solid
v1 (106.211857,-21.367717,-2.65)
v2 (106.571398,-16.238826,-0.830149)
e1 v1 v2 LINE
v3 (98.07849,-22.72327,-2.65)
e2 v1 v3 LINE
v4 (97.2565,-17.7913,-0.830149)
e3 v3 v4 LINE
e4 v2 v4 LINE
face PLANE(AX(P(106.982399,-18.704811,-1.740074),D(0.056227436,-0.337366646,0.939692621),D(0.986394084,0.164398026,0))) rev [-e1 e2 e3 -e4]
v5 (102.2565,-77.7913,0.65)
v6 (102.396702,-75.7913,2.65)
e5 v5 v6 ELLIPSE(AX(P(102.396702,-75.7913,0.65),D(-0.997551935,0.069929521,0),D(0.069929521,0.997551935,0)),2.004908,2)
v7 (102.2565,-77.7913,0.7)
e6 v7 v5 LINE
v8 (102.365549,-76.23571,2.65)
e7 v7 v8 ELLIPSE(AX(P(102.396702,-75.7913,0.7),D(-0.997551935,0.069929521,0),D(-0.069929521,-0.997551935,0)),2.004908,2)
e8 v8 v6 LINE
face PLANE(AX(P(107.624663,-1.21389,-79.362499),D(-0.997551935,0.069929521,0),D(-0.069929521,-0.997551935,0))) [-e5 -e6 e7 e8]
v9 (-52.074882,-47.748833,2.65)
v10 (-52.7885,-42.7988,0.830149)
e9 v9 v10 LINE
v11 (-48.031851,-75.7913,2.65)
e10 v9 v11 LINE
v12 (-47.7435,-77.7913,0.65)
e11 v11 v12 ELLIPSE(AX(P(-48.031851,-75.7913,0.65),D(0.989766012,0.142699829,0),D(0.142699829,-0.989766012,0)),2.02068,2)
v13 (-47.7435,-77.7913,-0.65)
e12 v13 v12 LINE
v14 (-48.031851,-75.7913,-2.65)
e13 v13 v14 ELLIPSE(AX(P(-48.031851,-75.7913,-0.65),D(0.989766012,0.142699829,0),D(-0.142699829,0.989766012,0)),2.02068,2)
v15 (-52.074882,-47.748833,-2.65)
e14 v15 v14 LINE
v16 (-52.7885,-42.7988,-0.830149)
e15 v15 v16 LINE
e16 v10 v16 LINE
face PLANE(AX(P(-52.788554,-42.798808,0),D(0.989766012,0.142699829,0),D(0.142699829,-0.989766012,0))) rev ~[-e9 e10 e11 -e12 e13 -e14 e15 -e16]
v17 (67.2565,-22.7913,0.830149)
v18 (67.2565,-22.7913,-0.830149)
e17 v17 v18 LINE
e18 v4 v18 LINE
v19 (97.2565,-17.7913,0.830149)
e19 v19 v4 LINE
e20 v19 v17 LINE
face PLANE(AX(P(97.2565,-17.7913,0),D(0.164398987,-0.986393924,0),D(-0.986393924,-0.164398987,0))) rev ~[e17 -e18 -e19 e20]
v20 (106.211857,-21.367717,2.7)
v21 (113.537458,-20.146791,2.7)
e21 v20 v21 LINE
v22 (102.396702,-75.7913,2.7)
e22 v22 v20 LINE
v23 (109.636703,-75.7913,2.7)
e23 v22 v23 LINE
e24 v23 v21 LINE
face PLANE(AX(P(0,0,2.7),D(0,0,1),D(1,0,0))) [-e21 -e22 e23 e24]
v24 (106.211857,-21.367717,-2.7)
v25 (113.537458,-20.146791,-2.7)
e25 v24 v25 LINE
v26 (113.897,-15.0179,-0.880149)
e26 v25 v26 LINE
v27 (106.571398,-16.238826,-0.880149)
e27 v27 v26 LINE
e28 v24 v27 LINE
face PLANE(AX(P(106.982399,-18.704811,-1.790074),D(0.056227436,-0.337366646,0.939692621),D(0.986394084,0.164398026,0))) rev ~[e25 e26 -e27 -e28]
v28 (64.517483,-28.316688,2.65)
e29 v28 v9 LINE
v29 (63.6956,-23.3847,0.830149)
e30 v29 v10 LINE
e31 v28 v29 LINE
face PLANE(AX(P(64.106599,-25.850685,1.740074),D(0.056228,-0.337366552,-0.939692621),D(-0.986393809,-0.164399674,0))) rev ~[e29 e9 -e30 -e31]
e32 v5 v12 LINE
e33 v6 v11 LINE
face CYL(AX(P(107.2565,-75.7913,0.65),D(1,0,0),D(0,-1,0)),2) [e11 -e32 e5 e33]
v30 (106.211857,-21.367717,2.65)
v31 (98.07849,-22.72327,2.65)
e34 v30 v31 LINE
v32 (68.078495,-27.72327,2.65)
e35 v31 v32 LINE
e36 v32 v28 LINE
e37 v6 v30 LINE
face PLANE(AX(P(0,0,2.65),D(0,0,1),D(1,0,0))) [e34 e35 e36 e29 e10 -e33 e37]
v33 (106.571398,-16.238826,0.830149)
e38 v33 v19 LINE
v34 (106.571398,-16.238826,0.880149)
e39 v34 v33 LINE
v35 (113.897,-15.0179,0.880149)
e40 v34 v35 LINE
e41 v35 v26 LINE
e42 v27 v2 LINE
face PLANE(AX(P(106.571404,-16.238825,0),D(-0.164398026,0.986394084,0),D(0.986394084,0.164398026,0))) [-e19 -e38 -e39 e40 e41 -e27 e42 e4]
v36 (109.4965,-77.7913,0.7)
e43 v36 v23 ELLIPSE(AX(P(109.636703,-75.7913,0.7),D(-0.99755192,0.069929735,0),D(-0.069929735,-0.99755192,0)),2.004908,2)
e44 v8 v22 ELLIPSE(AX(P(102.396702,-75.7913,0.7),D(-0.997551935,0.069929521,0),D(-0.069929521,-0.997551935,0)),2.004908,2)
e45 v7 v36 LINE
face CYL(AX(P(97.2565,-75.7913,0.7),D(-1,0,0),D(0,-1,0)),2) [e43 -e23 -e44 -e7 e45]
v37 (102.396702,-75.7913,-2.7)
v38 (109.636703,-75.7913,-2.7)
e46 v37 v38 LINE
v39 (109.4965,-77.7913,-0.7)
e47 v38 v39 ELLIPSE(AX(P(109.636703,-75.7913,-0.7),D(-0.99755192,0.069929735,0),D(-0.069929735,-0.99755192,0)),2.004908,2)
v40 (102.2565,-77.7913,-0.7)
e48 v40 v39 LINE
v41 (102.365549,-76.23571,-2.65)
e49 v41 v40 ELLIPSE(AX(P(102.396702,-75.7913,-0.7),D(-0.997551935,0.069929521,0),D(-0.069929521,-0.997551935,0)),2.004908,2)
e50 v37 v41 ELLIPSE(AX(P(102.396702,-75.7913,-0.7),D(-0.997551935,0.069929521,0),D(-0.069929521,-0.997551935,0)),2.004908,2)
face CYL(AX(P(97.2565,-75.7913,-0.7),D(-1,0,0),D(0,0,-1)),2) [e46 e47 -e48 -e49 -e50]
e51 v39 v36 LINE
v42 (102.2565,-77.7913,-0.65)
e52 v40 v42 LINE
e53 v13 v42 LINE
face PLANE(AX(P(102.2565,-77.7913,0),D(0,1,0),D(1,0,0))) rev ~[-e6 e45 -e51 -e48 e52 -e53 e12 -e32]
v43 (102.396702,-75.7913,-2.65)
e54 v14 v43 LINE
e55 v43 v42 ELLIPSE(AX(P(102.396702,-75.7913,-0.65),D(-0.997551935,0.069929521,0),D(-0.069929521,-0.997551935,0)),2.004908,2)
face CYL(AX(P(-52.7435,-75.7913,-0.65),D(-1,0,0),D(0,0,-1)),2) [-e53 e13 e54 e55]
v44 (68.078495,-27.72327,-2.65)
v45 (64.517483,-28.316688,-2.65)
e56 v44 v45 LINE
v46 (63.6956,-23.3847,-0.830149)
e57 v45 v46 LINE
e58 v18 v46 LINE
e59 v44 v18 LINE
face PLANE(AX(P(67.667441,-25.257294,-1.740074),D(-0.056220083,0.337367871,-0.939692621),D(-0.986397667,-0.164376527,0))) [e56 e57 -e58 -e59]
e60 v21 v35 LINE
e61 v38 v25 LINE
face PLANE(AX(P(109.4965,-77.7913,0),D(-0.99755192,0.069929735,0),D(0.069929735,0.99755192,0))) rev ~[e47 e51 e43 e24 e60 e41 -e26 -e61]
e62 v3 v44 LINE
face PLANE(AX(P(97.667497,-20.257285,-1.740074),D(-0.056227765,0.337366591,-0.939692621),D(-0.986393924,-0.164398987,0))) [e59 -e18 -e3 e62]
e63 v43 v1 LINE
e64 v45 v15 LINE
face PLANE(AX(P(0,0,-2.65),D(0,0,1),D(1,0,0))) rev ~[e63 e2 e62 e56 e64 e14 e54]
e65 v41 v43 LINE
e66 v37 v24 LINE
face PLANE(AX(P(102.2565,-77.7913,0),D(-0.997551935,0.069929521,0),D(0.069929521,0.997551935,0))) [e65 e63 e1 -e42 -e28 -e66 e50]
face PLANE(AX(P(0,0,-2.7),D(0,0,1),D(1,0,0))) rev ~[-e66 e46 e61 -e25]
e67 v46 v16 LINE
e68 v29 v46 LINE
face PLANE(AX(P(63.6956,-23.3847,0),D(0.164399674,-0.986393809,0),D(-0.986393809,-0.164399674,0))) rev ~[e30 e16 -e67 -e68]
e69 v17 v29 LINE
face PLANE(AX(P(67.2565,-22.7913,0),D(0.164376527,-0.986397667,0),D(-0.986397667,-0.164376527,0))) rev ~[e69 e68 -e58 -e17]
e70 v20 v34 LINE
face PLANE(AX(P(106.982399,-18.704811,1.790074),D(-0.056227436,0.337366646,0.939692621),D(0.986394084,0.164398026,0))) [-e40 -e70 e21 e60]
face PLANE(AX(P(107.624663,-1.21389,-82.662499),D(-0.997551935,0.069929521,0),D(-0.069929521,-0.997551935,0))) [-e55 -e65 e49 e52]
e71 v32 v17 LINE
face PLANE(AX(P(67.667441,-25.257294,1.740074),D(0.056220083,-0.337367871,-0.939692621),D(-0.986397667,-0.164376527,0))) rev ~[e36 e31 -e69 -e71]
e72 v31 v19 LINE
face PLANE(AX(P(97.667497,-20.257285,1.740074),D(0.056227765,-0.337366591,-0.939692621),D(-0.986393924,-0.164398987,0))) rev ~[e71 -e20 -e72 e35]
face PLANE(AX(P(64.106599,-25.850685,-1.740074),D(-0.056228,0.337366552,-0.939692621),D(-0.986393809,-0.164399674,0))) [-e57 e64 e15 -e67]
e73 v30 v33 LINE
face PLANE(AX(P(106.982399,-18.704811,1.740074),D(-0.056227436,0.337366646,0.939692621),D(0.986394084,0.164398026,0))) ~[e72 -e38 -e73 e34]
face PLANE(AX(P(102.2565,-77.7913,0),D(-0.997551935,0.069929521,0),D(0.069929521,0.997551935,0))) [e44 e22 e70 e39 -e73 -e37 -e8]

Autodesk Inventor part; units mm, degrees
ref_plane "YZ Plane" through (0, 0, 0) normal (1, 0, 0) x (0, 1, 0)
ref_plane "XZ Plane" through (0, 0, 0) normal (0, 1, 0) x (-1, 0, 0)
ref_plane "XY Plane" through (0, 0, 0) normal (0, 0, 1) x (1, 0, 0)
sketch "Sketch1" plane through (0, 0, 0) normal (0, 0, 1) x (1, 0, 0)
  line L0 (-47.7435, -77.7913) -> (102.2565, -77.7913)
  line L1 (102.2565, -77.7913) -> (109.4965, -77.7913)
  line L2 (-47.7435, -77.7913) -> (-47.7435, -13.2313) construction
  line L3 (-47.7435, -13.2313) -> (-47.7435, 15.6487) construction
  line L4 (-47.7435, -77.7913) -> (-47.7435, -72.7913)
  line L5 (-47.7435, -72.7913) -> (-61.2235, -72.7913) construction
  line L6 (-47.7435, -72.7913) -> (-47.7435, -57.7913) construction
  line L7 (-47.7435, -57.7913) -> (-65.2735, -57.7913) construction
  line L8 (-47.7435, -57.7913) -> (-47.7435, -42.7913) construction
  line L9 (-47.7435, -42.7913) -> (-67.4235, -42.7913) construction
  line L10 (-47.7435, -42.7913) -> (-47.7435, -27.7913) construction
  line L11 (-47.7435, -27.7913) -> (-69.5835, -27.7913) construction
  line L12 (-47.7435, -27.7913) -> (-47.7435, -12.7913) construction
  line L13 (-47.7435, -12.7913) -> (-72.3735, -12.7913) construction
  line L14 (-47.7435, -77.7913) -> (42.2565, -77.7913)
  line L15 (42.2565, -77.7913) -> (42.2565, 92.2087) construction
  line L16 (42.2565, 92.2087) -> (-47.7435, 15.6487)
  line L17 (42.2565, 92.2087) -> (47.8065, 92.2087)
  line L18 (42.2565, -77.7913) -> (67.2565, -77.7913)
  line L19 (67.2565, -77.7913) -> (67.2565, -22.7913) construction
  line L20 (67.2565, -22.7913) -> (63.6956, -23.3847)
  line L21 (102.2565, -77.7913) -> (97.2565, -77.7913)
  line L22 (97.2565, -77.7913) -> (97.2565, -17.7913) construction
  line L23 (97.2565, -17.7913) -> (113.897, -15.0179)
  line L24 (109.4965, -77.7913) -> (113.897, -15.0179)
  line L25 (97.2565, -17.7913) -> (67.2565, -22.7913)
  line L26 (63.6956, -23.3847) -> (47.8065, 92.2087)
  spline S0 degree 2 poles (42.2565, 92.2087) (45.0586, 96.9623) (47.8065, 92.2087) knots 0 0 0 1 1 1
  line L27 (-59.7435, -93.9838) -> (-59.7435, 5.4407) construction
  line L28 (-47.7435, 15.6487) -> (-59.7435, 5.4407)
  line L29 (-59.7435, 5.4407) -> (-47.7435, -77.7913)
  line L30 (-69.5835, -27.7913) -> (-65.2735, -57.7913)
  line L31 (-47.7435, -77.7913) -> (-61.2235, -72.7913) construction
  line L32 (-61.2235, -72.7913) -> (-65.2735, -57.7913) construction
  spline S1 degree 2 poles (-47.7435, -77.7913) (-61.2235, -72.7913) (-65.2735, -57.7913) knots 1 1 1 2 2 2
  line L33 (-69.5835, -27.7913) -> (-72.3735, -12.7913) construction
  line L34 (-72.3735, -12.7913) -> (-59.7435, 5.4407) construction
  spline S2 degree 2 poles (-69.5835, -27.7913) (-72.3735, -12.7913) (-59.7435, 5.4407) knots 1 1 1 2 2 2
  line L35 (102.2565, -77.7913) -> (106.5714, -16.2388)
  line L36 (63.6956, -23.3847) -> (-52.7885, -42.7988)
  line L37 (-131.9637, -55.9946) -> (-133.7071, -56.2852)
  point P0 (0, 0)
  point P1 (45.0505, 94.5855)
  point P2 (-53.7435, 10.5447)
  dimension "d0" = 150
  dimension "d1" = 7.24
  dimension "d2" = 64.56
  dimension "d3" = 28.88
  dimension "d4" = 13.48
  dimension "d5" = 15
  dimension "d6" = 17.53
  dimension "d7" = 15
  dimension "d8" = 19.68
  dimension "d9" = 15
  dimension "d10" = 21.84
  dimension "d11" = 15
  dimension "d12" = 24.63
  dimension "d13" = 90
  dimension "d14" = 170
  dimension "d15" = 5.55
  dimension "d16" = 25
  dimension "d17" = 55
  dimension "d18" = 3.61
  dimension "d19" = 5
  dimension "d20" = 60
  dimension "d21" = 16.87
  dimension "d22" = 12
  dimension "d23" = 5
extrude "Extrusion1" add sketch "Sketch1" along normal mid plane 5.3 contours L29 L36 L20 L25 L23 L35 L0
extrude "Extrusion2" add sketch "Sketch1" along normal mid plane 5.4 contours L35 L23 L24 L1
chamfer "Chamfer1" distance 5 angle 20 1 edges at (26.8914, -29.5188, 2.65) measured on face at (52.0131, -45.6096, 2.65)
chamfer "Chamfer2" distance 5 angle 20 1 edges at (110.2342, -15.6283, 2.7) measured on face at (109.9883, -36.3493, 2.7)
chamfer "Chamfer3" distance 5 angle 20 1 edges at (26.8914, -29.5188, -2.65) measured on face at (52.0131, -45.6096, -2.65)
chamfer "Chamfer4" distance 5 angle 20 1 edges at (110.2342, -15.6283, -2.7) measured on face at (109.9883, -36.3493, -2.7)
fillet "Fillet1" radius 2 4 edges at (27.2565, -77.7913, -2.65) (105.8765, -77.7913, -2.7) (27.2565, -77.7913, 2.65) (105.8765, -77.7913, 2.7)
properties part number "vertical_stabilizer_01"
